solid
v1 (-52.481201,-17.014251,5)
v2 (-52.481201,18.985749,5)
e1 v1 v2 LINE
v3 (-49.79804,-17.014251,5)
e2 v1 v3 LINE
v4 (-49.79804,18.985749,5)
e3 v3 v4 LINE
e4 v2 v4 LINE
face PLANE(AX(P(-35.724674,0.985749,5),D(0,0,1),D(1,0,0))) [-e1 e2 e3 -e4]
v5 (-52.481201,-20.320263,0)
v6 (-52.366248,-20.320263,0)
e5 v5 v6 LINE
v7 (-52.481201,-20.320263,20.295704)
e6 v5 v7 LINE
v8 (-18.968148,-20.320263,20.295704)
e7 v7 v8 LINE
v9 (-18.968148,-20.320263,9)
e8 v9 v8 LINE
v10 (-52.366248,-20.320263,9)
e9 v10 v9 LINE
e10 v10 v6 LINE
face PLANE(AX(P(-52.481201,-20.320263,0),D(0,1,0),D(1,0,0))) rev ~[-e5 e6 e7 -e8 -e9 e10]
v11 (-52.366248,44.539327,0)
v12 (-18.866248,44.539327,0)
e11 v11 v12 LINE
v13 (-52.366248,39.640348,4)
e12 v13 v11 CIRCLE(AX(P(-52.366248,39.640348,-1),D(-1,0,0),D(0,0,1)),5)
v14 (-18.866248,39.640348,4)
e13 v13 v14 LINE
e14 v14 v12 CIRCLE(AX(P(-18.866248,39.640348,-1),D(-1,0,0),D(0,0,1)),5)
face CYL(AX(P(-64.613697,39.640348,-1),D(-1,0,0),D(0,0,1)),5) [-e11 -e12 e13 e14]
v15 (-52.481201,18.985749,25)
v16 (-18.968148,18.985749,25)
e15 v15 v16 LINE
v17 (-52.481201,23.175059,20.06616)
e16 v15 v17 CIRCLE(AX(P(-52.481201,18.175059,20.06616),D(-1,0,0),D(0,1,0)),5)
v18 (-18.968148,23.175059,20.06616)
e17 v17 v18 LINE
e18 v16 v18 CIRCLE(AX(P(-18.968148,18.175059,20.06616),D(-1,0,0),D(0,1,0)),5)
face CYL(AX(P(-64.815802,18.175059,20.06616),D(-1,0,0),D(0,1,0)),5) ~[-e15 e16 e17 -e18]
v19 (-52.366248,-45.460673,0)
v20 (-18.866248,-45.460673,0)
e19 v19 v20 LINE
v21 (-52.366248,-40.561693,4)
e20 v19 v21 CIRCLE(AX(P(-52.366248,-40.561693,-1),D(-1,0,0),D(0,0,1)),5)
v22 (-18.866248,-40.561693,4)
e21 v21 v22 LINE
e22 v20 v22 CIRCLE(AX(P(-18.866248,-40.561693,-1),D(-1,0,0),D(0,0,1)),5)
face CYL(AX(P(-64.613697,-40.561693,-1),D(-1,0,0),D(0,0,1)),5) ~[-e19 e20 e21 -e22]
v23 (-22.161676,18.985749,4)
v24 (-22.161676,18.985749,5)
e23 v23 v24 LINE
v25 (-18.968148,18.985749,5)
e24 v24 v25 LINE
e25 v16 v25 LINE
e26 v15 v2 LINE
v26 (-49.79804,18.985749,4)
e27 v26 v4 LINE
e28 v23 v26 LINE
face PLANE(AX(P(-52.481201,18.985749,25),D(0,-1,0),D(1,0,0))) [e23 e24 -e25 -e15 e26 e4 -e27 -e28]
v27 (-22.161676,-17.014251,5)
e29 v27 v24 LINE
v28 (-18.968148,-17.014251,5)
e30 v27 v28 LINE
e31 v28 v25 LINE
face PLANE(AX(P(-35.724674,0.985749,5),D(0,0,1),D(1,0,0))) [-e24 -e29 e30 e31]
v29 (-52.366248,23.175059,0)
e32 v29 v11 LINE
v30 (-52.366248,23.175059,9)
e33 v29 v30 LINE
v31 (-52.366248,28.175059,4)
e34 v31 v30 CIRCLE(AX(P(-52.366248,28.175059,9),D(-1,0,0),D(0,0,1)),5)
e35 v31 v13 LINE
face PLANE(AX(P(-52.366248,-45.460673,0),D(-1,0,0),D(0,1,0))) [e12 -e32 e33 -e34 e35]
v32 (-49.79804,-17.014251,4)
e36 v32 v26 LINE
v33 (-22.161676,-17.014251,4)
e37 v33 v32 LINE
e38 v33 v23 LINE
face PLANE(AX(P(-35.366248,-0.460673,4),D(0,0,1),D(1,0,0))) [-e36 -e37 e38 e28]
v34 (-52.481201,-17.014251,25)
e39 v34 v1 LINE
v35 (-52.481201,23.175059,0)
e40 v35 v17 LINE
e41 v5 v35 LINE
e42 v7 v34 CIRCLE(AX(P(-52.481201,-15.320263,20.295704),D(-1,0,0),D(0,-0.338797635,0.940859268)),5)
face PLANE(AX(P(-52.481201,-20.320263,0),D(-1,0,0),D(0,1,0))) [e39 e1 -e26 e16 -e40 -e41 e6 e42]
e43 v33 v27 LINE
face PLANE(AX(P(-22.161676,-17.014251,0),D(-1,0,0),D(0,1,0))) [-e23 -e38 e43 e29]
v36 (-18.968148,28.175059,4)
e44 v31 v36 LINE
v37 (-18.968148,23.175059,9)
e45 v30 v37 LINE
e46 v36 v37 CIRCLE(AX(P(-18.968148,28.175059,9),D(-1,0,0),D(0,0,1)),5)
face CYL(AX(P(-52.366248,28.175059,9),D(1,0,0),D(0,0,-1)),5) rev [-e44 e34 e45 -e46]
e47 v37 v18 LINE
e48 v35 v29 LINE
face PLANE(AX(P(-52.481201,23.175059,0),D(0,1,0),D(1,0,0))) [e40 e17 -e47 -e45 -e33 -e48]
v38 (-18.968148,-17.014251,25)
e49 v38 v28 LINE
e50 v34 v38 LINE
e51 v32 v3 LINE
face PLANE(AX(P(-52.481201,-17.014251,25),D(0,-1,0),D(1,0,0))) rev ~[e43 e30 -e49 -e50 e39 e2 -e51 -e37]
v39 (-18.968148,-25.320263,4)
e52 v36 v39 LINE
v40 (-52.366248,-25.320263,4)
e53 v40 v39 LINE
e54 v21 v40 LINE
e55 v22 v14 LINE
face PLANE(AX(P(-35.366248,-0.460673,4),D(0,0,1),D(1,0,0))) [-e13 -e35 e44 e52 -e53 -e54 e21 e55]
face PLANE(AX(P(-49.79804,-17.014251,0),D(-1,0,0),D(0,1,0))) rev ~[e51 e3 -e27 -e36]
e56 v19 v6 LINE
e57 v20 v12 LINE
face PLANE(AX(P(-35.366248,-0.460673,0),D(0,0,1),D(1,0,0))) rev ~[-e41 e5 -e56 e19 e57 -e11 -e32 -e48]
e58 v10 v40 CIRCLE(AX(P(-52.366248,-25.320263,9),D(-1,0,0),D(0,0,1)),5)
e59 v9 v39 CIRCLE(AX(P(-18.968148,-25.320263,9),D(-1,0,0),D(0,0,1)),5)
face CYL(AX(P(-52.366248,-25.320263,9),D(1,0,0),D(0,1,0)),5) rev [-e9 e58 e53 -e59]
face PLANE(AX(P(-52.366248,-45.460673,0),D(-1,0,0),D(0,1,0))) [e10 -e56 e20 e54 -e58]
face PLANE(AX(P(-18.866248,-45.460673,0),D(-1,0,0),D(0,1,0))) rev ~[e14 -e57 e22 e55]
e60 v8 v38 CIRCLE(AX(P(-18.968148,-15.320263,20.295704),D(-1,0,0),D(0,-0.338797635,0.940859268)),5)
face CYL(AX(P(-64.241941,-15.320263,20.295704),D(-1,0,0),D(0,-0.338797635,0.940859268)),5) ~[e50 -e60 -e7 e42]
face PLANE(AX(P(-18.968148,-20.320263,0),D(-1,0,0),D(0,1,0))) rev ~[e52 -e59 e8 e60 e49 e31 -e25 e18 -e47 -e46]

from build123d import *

# Parameters (mm, degrees)
F1_W        = 33.513052389
F1_H        = 43.4953216463
F2_DEPTH    = 25
F0_W        = 27.636364032
F0_H        = 36
F3_DEPTH    = 25
F4_W        = 33.513052389
F4_H        = 36
F5_DEPTH    = 20
F6_T1_DEPTH = 58.1822545614
F6_T3_DEPTH = 57.0345340949
F7_W        = 34
F7_H        = 90
F8_DEPTH    = 4
F9_T1_DEPTH = 58.4948974279
F10_R       = 5
F11_DEPTH   = 0.5


# Not quite as in the source:
# - a fillet or chamfer that OpenCascade refuses, or shapes differently, is made with other operations: its cross-section is extruded or revolved along the edge and cut away or added


with BuildPart() as f2:
    # F1 (on Top) → F2 (new body)
    with BuildSketch(Plane.XY):
        with Locations((-35.7246743515, 1.4273980632)):
            Rectangle(F1_W, F1_H)
    extrude(amount=F2_DEPTH)

    # F0 (on Top) → F3 (cut)
    with BuildSketch(Plane.XY):
        with Locations((-35.9798576683, 0.9857490659)):
            Rectangle(F0_W, F0_H)
    extrude(amount=F3_DEPTH, mode=Mode.SUBTRACT)

    # F4 (on face) → F5 (cut)
    with BuildSketch(Plane.XY.offset(25)):
        with Locations((-35.7246743515, 0.9857490659)):
            Rectangle(F4_W, F4_H)
    extrude(amount=-F5_DEPTH, mode=Mode.SUBTRACT)

    # F6: fillet of radius 5 on 2 edges, made by hand

    # F6_s2 → F6_t1 (cut)
    with BuildSketch(Plane.YZ.offset(-64.8158016322)):
        with BuildLine():
            ThreePointArc((23.1750588864, 20.0661595655), (21.9864530472, 23.302403461), (18.9857490659, 25))
            Line((18.9857490659, 25), (23.1750588864, 25))
            Line((23.1750588864, 25), (23.1750588864, 20.0661595655))
        make_face()
    extrude(amount=F6_T1_DEPTH, mode=Mode.SUBTRACT)

    # F6_s4 → F6_t3 (cut)
    with BuildSketch(Plane.YZ.offset(-64.241941399)):
        with BuildLine():
            ThreePointArc((-17.0142509341, 25), (-19.4111025802, 23.170600103), (-20.3202627599, 20.2957036588))
            Line((-20.3202627599, 20.2957036588), (-20.3202627599, 25))
            Line((-20.3202627599, 25), (-17.0142509341, 25))
        make_face()
    extrude(amount=F6_T3_DEPTH, mode=Mode.SUBTRACT)

    # F7 (on Top) → F8 (join)
    with BuildSketch(Plane.XY):
        with Locations((-35.3662480154, -0.4606725276)):
            Rectangle(F7_W, F7_H)
    extrude(amount=F8_DEPTH)

    # F9: fillet of radius 5 on 2 edges, made by hand

    # F9_s2 → F9_t1 (cut)
    with BuildSketch(Plane.YZ.offset(-64.6136967294)):
        with BuildLine():
            ThreePointArc((-40.561693042, 4), (-43.7239707021, 2.8729833462), (-45.4606725275, 0))
            Line((-45.4606725275, 0), (-45.4606725276, 4))
            Line((-45.4606725276, 4), (-40.561693042, 4))
        make_face()
        with BuildLine():
            ThreePointArc((39.6403479869, 4), (42.802625647, 2.8729833462), (44.5393274724, 0))
            Line((44.5393274724, 0), (44.5393274724, 4))
            Line((44.5393274724, 4), (39.6403479869, 4))
        make_face()
    extrude(amount=F9_T1_DEPTH, mode=Mode.SUBTRACT)

    # F10
    f10_edges = [f2.edges().sort_by_distance(p)[0] for p in [
        (-35.667198, -20.320263, 4),
        (-35.667198, 23.175059, 4),
    ]]
    fillet(f10_edges, radius=F10_R)

    # F11 (cut): a face of the model
    f11_faces = [f2.faces().sort_by_distance(p)[0] for p in [
        (-18.3662480154, -0.4606725276, 1.9725049158),
    ]]
    extrude(f11_faces, amount=-F11_DEPTH, mode=Mode.SUBTRACT)


solid = f2.part
